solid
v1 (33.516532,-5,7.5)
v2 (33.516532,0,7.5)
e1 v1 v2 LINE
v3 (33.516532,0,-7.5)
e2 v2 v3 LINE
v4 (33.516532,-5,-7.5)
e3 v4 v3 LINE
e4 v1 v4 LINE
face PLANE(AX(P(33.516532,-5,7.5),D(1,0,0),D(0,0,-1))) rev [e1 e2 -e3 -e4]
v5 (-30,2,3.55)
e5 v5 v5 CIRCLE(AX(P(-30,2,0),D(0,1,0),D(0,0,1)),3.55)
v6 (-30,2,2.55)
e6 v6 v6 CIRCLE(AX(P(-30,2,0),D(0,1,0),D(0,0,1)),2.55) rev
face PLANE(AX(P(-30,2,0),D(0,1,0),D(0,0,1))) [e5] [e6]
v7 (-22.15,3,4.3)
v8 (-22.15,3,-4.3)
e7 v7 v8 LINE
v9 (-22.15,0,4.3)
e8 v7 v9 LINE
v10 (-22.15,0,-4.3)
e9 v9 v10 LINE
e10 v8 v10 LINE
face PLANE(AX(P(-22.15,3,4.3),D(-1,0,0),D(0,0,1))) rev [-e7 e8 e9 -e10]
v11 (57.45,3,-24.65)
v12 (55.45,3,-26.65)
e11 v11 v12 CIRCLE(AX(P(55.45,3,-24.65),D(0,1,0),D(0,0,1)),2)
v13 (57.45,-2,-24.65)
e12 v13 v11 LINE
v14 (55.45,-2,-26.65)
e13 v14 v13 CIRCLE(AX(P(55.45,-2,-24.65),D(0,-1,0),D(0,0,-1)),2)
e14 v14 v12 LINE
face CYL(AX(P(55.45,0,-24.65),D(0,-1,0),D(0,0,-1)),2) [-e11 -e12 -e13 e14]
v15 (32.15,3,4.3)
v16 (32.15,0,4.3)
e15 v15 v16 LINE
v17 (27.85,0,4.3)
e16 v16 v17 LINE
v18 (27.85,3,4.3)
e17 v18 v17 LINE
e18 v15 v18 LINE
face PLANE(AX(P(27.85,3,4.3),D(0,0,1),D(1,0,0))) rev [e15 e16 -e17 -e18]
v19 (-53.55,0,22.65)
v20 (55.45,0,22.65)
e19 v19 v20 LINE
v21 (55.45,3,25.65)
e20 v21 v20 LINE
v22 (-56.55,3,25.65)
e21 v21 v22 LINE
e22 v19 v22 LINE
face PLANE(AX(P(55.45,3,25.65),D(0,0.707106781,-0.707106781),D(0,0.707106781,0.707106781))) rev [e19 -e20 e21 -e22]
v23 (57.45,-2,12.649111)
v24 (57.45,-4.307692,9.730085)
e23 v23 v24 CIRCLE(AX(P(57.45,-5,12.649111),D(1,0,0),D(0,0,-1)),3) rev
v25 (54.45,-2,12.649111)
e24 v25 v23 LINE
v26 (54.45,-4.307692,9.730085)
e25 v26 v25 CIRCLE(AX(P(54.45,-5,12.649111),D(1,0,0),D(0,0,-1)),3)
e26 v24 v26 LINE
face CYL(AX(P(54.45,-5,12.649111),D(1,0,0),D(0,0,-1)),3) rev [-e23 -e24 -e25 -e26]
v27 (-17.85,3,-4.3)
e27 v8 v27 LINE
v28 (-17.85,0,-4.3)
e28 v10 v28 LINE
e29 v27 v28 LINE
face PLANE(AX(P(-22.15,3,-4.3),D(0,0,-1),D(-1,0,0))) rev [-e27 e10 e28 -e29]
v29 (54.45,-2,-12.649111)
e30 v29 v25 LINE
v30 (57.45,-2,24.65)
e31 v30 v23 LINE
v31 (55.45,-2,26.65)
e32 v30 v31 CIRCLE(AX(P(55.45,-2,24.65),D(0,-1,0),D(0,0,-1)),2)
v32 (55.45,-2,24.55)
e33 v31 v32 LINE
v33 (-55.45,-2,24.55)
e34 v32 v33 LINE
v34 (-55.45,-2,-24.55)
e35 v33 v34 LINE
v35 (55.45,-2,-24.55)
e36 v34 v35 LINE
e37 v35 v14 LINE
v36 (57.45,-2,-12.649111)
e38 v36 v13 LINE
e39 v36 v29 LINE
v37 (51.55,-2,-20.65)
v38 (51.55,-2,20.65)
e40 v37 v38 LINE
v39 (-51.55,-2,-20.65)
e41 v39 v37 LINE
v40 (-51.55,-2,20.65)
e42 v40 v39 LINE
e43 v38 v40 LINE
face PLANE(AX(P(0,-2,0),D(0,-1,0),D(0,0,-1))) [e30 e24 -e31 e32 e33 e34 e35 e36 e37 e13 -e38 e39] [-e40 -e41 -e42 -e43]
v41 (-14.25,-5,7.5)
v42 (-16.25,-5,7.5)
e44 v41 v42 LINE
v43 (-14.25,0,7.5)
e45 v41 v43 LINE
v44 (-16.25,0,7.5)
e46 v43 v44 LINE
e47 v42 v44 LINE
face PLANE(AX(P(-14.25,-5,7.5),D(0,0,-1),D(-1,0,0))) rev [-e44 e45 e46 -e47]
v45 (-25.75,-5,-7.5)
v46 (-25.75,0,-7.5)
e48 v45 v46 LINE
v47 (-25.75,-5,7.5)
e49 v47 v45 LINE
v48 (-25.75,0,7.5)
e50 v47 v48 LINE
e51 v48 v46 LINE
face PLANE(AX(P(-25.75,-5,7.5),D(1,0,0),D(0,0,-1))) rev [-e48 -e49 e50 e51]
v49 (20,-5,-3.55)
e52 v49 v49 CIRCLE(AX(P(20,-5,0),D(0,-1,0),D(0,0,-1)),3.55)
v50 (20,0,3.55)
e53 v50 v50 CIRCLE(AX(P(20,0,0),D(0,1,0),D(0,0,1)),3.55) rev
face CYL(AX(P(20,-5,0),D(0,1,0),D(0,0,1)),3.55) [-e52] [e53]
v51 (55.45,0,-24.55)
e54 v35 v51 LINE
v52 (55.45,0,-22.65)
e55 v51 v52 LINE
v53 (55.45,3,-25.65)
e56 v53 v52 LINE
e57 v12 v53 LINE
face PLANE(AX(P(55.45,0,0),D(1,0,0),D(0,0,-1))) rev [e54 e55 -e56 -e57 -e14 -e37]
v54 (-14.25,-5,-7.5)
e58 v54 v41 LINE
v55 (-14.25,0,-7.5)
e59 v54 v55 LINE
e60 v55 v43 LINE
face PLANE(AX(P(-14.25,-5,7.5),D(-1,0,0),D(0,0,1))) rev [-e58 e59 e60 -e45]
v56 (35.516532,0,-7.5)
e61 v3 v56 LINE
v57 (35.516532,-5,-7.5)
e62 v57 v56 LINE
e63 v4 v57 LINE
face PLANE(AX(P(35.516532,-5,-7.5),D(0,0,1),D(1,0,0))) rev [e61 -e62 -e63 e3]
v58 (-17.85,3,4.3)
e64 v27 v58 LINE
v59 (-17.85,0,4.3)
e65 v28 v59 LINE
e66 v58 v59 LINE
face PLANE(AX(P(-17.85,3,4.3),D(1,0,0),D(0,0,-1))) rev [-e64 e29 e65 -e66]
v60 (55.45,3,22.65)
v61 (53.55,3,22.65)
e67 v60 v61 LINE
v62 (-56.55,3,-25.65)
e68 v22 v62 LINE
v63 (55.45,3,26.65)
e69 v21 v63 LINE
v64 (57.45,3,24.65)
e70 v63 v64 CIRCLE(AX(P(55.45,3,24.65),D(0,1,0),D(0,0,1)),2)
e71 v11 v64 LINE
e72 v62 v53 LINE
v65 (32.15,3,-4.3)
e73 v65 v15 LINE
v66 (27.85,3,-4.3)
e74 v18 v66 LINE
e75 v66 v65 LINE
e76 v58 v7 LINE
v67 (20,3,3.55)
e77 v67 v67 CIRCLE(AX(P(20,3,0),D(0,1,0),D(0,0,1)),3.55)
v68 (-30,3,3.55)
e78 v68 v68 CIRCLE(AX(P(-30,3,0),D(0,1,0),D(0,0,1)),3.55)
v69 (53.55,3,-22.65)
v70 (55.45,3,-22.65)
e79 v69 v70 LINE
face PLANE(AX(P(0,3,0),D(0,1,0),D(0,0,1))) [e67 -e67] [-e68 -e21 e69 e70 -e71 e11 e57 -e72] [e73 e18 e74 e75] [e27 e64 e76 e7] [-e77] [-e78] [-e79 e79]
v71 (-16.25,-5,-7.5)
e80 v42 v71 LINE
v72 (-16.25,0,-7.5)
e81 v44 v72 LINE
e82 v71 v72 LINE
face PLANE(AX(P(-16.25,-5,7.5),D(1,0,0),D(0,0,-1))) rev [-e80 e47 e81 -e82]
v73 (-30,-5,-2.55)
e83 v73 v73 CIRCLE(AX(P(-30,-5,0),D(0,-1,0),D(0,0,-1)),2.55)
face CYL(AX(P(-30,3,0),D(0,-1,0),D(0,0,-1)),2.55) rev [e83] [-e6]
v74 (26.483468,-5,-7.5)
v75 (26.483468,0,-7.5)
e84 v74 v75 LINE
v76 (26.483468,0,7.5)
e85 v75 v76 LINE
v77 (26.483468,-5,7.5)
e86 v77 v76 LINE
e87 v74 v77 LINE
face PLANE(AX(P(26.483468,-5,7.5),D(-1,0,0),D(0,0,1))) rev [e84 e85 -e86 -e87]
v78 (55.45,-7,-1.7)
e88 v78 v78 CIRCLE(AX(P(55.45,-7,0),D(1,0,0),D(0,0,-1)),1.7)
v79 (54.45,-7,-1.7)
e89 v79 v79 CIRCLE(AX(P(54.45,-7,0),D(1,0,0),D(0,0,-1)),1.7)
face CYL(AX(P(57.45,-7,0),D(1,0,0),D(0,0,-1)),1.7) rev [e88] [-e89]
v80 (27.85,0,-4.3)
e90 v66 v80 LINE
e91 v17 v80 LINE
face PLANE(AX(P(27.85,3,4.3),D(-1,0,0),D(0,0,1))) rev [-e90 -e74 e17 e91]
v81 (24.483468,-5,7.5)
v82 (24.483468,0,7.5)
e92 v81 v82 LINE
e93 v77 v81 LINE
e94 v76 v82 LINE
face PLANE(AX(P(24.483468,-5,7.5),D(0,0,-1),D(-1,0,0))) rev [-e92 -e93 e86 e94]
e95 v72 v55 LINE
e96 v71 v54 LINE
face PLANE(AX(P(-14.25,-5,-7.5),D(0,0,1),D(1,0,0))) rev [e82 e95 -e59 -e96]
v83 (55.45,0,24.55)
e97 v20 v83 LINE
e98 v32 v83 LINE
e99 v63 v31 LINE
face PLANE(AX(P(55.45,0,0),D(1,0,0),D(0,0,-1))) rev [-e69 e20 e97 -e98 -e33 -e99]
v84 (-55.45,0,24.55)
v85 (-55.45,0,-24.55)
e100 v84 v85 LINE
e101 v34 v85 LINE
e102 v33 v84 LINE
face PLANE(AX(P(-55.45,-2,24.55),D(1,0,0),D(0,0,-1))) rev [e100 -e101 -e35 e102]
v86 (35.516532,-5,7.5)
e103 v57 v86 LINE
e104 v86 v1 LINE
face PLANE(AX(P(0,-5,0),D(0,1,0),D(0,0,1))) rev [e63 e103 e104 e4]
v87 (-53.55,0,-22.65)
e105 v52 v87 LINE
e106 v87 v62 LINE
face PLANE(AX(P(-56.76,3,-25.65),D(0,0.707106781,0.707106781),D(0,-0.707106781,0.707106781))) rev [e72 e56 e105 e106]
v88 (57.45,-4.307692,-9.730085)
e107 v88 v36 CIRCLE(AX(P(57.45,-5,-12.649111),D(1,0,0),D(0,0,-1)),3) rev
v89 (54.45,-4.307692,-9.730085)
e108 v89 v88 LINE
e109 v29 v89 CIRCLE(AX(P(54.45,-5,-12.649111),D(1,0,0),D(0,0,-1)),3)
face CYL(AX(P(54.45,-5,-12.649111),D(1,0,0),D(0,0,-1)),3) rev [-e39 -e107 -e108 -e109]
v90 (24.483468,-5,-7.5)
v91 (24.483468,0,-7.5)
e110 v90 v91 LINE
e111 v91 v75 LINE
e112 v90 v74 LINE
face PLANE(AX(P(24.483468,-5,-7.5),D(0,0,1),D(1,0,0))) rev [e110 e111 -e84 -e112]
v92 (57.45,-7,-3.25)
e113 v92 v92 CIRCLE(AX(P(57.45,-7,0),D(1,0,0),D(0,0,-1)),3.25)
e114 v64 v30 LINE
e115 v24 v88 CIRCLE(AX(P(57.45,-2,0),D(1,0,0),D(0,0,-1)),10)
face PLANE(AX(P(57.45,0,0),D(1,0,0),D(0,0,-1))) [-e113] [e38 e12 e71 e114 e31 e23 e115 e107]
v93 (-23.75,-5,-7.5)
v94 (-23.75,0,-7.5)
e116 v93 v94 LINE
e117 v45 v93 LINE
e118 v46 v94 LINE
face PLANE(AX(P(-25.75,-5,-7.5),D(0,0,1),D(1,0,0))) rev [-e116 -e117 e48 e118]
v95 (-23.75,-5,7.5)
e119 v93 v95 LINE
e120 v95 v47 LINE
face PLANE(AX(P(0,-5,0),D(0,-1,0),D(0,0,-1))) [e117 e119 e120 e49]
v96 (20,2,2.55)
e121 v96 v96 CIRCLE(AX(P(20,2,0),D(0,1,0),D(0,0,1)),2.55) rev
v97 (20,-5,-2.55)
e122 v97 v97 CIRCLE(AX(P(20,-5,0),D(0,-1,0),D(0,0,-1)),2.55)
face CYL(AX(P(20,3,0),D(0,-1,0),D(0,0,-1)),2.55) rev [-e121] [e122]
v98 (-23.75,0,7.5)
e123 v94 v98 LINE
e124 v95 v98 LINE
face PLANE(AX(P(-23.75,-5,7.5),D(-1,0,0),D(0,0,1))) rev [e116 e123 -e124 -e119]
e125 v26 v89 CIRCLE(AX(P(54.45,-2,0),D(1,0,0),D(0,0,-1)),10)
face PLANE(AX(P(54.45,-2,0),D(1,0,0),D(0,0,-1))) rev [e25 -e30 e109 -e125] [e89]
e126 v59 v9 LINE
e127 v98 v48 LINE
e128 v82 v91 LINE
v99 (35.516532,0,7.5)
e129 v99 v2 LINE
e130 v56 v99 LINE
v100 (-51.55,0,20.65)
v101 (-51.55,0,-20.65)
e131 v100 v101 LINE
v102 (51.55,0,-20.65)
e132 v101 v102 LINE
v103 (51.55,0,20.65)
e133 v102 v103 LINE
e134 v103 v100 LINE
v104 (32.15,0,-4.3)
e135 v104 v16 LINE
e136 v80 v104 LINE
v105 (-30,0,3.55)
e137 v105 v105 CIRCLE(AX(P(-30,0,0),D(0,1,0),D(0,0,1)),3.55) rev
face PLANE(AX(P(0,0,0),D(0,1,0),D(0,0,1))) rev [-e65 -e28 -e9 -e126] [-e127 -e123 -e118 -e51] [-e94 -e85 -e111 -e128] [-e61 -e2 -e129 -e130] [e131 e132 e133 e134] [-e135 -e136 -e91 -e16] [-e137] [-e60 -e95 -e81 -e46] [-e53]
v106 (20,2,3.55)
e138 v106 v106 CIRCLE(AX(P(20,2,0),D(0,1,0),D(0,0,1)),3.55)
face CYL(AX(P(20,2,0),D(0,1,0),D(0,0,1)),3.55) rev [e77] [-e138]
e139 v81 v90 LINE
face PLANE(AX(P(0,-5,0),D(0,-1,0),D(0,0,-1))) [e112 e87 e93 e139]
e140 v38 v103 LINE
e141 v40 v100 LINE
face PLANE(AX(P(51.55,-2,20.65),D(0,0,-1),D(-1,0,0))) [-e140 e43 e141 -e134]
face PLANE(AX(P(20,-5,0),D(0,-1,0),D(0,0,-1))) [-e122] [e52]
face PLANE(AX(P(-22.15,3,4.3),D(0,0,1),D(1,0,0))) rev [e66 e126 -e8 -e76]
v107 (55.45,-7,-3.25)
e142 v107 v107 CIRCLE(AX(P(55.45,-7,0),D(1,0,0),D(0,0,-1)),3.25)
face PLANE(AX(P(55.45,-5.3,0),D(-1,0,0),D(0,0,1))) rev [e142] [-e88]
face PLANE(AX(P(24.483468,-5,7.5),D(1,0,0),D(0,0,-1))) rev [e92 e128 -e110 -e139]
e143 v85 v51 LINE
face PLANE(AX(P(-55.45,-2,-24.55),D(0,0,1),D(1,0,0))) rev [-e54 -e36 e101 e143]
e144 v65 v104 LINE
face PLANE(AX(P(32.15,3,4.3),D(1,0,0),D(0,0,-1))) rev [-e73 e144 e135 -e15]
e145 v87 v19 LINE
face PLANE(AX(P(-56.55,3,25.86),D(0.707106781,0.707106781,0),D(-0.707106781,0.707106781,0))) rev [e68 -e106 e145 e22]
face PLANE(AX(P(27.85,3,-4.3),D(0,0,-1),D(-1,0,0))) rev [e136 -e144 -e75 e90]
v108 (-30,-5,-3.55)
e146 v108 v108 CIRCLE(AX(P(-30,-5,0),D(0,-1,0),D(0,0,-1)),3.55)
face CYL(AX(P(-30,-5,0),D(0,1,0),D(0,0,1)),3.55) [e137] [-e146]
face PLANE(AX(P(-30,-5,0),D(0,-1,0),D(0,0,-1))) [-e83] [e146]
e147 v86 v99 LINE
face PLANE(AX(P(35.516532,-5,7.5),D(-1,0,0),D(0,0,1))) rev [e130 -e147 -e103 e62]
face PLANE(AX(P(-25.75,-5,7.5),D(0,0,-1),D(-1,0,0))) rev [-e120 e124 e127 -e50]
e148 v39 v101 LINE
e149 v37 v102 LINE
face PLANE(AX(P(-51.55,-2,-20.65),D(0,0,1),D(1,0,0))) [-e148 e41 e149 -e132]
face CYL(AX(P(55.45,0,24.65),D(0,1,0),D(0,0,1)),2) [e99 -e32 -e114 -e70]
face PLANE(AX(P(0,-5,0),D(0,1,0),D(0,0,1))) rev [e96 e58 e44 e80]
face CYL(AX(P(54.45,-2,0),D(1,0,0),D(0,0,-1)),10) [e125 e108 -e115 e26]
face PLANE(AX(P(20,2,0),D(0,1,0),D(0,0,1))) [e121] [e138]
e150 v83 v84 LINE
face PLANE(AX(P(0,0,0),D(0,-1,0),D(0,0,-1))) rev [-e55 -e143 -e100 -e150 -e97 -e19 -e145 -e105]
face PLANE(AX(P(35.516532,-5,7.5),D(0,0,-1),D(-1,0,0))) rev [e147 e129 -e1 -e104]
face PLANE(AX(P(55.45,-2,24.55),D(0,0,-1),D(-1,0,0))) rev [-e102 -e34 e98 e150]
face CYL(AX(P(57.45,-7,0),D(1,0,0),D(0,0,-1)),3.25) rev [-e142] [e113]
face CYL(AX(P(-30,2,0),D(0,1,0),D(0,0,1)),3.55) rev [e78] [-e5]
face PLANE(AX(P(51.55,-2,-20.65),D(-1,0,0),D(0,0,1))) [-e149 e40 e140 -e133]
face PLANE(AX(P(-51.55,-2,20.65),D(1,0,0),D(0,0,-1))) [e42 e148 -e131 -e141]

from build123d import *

# Parameters (mm, degrees)
SKETCH1_W                                   = 107.1
SKETCH1_H                                   = 45.3
BOSS_EXTRUDE1_DEPTH                         = 3
SKETCH2_W                                   = 110.9
SKETCH2_H                                   = 49.1
SKETCH2_W_2                                 = 103.1
SKETCH2_H_2                                 = 41.3
BOSS_EXTRUDE2_DEPTH                         = 2
SKETCH5_W                                   = 44.185299266
SKETCH5_H                                   = 3
BOSS_EXTRUDE3_DEPTH                         = 1.9
SKETCH6_W                                   = 53.3
SKETCH6_H                                   = 5
BOSS_EXTRUDE4_DEPTH                         = 2
FILLET1_R                                   = 2
BOSS_EXTRUDE5_DEPTH                         = 3
FILLET2_R                                   = 3
CBORE_FOR_M3_CHEESE_HEAD_SCREW1_D           = 3.4
CBORE_FOR_M3_CHEESE_HEAD_SCREW1_CBORE_D     = 6.5
CBORE_FOR_M3_CHEESE_HEAD_SCREW1_CBORE_DEPTH = 2
SKETCH9_R                                   = 2.55
SKETCH9_W                                   = 4.3
SKETCH9_H                                   = 8.6
CUT_EXTRUDE1_DEPTH                          = 65.457156313
BOSS_EXTRUDE6_START                         = 5
SKETCH11_R                                  = 3.55
SKETCH11_R_2                                = 2.55
SKETCH11_W                                  = 2
SKETCH11_H                                  = 15
BOSS_EXTRUDE6_DEPTH                         = 5
CUT_EXTRUDE2_START                          = -1
SKETCH12_R                                  = 3.55
CUT_EXTRUDE2_DEPTH                          = 1


with BuildPart() as part:
    # Sketch1 → Boss-Extrude1 (new body)
    with BuildSketch(Plane(origin=(0, 0, 0), x_dir=(1, 0, 0), z_dir=(0, 1, 0))):
        Rectangle(SKETCH1_W, SKETCH1_H)
    extrude(amount=BOSS_EXTRUDE1_DEPTH)

    # Sketch2 → Boss-Extrude2 (add)
    with BuildSketch(Plane.XZ):
        Rectangle(SKETCH2_W, SKETCH2_H)
        Rectangle(SKETCH2_W_2, SKETCH2_H_2, mode=Mode.SUBTRACT)
    extrude(amount=BOSS_EXTRUDE2_DEPTH)

    # Sweep3: sweep along a path in Sketch4
    with BuildLine(Plane(origin=(0, 0, 0), x_dir=(1, 0, 0), z_dir=(0, 1, 0))) as sweep3_path:
        Line((55.45, 24.55), (-55.45, 24.55))
        Line((-55.45, 24.55), (-55.45, -24.55))
        Line((-55.45, -24.55), (55.45, -24.55))
    # Sketch3 → Sweep3 (sweep)
    with BuildSketch(Plane(origin=(55.45, 0, 0), x_dir=(0, 0, -1), z_dir=(1, 0, 0))):
        Polygon((-22.65, 3), (-25.65, 3), (-22.65, 0), (-22.092649633, 0), (-22.092649633, 3), align=None)
    sweep(path=sweep3_path.line, transition=Transition.RIGHT)

    # Sketch5 → Boss-Extrude3 (add)
    with BuildSketch(Plane(origin=(53.55, 0, 0), x_dir=(0, 0, -1), z_dir=(1, 0, 0))):
        with Locations((0, 1.5)):
            Rectangle(SKETCH5_W, SKETCH5_H)
    extrude(amount=BOSS_EXTRUDE3_DEPTH)

    # Sketch6 → Boss-Extrude4 (add)
    with BuildSketch(Plane(origin=(55.45, 0, 0), x_dir=(0, 0, -1), z_dir=(1, 0, 0))):
        with Locations((0, 0.5)):
            Rectangle(SKETCH6_W, SKETCH6_H)
    extrude(amount=BOSS_EXTRUDE4_DEPTH)

    # Fillet1
    fillet1_edges = [part.edges().sort_by_distance(p)[0] for p in [
        (57.45, 0.5, 26.65),
        (57.45, 0.5, -26.65),
    ]]
    fillet(fillet1_edges, radius=FILLET1_R - 0.0001)  # a hair under: the kernel refuses the full size

    # Sketch7 → Boss-Extrude5 (add)
    with BuildSketch(Plane(origin=(57.45, 0, 0), x_dir=(0, 0, -1), z_dir=(1, 0, 0))):
        with BuildLine():
            Line((-10, -2), (10, -2))
            ThreePointArc((10, -2), (0, -12), (-10, -2))
        make_face()
    extrude(amount=-BOSS_EXTRUDE5_DEPTH)

    # Fillet2
    fillet2_edges = [part.edges().sort_by_distance(p)[0] for p in [
        (55.95, -2, -10),
        (55.95, -2, 10),
    ]]
    fillet(fillet2_edges, radius=FILLET2_R)

    # CBORE for M3 Cheese Head Screw1 (through all)
    with Locations(Plane(origin=(57.45, -7, 0), x_dir=(0, 0, 1), z_dir=(1, 0, 0))):
        with Locations((0, 0)):
            CounterBoreHole(CBORE_FOR_M3_CHEESE_HEAD_SCREW1_D / 2, CBORE_FOR_M3_CHEESE_HEAD_SCREW1_CBORE_D / 2, CBORE_FOR_M3_CHEESE_HEAD_SCREW1_CBORE_DEPTH)

    # Sketch9 → Cut-Extrude1 (cut, through all)
    with BuildSketch(Plane.XZ):
        with Locations(Location((20, 0, 0), (0, 0, 270))):
            Circle(SKETCH9_R)
        with Locations(Location((-30, 0, 0), (0, 0, 270))):
            Circle(SKETCH9_R)
        with Locations((30, 0)):
            Rectangle(SKETCH9_W, SKETCH9_H)
        with Locations((-20, 0)):
            Rectangle(SKETCH9_W, SKETCH9_H)
    extrude(amount=-CUT_EXTRUDE1_DEPTH, mode=Mode.SUBTRACT)

    # Sketch11 → Boss-Extrude6 (add)
    # profile 1 of 6: a face of its own
    with BuildSketch(Plane.XZ.offset(BOSS_EXTRUDE6_START)):
        with Locations(Location((-30, 0, 0), (0, 0, 90))):
            Circle(SKETCH11_R)
        with Locations(Location((-30, 0, 0), (0, 0, 270))):
            Circle(SKETCH11_R_2, mode=Mode.SUBTRACT)
    # profile 2 of 6: a face of its own
    with BuildSketch(Plane.XZ.offset(BOSS_EXTRUDE6_START)):
        with Locations(Location((20, 0, 0), (0, 0, 90))):
            Circle(SKETCH11_R)
        with Locations(Location((20, 0, 0), (0, 0, 270))):
            Circle(SKETCH11_R_2, mode=Mode.SUBTRACT)
    # profile 3 of 6: a face of its own
    with BuildSketch(Plane.XZ.offset(BOSS_EXTRUDE6_START)):
        with Locations((-15.25, 0)):
            Rectangle(SKETCH11_W, SKETCH11_H)
    # profile 4 of 6: a face of its own
    with BuildSketch(Plane.XZ.offset(BOSS_EXTRUDE6_START)):
        with Locations((-24.75, 0)):
            Rectangle(SKETCH11_W, SKETCH11_H)
    # profile 5 of 6: a face of its own
    with BuildSketch(Plane.XZ.offset(BOSS_EXTRUDE6_START)):
        with Locations((34.516532033, 0)):
            Rectangle(SKETCH11_W, SKETCH11_H)
    # profile 6 of 6: a face of its own
    with BuildSketch(Plane.XZ.offset(BOSS_EXTRUDE6_START)):
        with Locations((25.483467967, 0)):
            Rectangle(SKETCH11_W, SKETCH11_H)
    extrude(amount=-BOSS_EXTRUDE6_DEPTH)

    # Sketch12 → Cut-Extrude2 (cut)
    with BuildSketch(Plane(origin=(0, 3, 0), x_dir=(1, 0, 0), z_dir=(0, 1, 0)).offset(CUT_EXTRUDE2_START)):
        with Locations(Location((-30, 0, 0), (0, 0, 270))):
            Circle(SKETCH12_R)
        with Locations(Location((20, 0, 0), (0, 0, 270))):
            Circle(SKETCH12_R)
    extrude(amount=CUT_EXTRUDE2_DEPTH, mode=Mode.SUBTRACT)


solid = part.part
